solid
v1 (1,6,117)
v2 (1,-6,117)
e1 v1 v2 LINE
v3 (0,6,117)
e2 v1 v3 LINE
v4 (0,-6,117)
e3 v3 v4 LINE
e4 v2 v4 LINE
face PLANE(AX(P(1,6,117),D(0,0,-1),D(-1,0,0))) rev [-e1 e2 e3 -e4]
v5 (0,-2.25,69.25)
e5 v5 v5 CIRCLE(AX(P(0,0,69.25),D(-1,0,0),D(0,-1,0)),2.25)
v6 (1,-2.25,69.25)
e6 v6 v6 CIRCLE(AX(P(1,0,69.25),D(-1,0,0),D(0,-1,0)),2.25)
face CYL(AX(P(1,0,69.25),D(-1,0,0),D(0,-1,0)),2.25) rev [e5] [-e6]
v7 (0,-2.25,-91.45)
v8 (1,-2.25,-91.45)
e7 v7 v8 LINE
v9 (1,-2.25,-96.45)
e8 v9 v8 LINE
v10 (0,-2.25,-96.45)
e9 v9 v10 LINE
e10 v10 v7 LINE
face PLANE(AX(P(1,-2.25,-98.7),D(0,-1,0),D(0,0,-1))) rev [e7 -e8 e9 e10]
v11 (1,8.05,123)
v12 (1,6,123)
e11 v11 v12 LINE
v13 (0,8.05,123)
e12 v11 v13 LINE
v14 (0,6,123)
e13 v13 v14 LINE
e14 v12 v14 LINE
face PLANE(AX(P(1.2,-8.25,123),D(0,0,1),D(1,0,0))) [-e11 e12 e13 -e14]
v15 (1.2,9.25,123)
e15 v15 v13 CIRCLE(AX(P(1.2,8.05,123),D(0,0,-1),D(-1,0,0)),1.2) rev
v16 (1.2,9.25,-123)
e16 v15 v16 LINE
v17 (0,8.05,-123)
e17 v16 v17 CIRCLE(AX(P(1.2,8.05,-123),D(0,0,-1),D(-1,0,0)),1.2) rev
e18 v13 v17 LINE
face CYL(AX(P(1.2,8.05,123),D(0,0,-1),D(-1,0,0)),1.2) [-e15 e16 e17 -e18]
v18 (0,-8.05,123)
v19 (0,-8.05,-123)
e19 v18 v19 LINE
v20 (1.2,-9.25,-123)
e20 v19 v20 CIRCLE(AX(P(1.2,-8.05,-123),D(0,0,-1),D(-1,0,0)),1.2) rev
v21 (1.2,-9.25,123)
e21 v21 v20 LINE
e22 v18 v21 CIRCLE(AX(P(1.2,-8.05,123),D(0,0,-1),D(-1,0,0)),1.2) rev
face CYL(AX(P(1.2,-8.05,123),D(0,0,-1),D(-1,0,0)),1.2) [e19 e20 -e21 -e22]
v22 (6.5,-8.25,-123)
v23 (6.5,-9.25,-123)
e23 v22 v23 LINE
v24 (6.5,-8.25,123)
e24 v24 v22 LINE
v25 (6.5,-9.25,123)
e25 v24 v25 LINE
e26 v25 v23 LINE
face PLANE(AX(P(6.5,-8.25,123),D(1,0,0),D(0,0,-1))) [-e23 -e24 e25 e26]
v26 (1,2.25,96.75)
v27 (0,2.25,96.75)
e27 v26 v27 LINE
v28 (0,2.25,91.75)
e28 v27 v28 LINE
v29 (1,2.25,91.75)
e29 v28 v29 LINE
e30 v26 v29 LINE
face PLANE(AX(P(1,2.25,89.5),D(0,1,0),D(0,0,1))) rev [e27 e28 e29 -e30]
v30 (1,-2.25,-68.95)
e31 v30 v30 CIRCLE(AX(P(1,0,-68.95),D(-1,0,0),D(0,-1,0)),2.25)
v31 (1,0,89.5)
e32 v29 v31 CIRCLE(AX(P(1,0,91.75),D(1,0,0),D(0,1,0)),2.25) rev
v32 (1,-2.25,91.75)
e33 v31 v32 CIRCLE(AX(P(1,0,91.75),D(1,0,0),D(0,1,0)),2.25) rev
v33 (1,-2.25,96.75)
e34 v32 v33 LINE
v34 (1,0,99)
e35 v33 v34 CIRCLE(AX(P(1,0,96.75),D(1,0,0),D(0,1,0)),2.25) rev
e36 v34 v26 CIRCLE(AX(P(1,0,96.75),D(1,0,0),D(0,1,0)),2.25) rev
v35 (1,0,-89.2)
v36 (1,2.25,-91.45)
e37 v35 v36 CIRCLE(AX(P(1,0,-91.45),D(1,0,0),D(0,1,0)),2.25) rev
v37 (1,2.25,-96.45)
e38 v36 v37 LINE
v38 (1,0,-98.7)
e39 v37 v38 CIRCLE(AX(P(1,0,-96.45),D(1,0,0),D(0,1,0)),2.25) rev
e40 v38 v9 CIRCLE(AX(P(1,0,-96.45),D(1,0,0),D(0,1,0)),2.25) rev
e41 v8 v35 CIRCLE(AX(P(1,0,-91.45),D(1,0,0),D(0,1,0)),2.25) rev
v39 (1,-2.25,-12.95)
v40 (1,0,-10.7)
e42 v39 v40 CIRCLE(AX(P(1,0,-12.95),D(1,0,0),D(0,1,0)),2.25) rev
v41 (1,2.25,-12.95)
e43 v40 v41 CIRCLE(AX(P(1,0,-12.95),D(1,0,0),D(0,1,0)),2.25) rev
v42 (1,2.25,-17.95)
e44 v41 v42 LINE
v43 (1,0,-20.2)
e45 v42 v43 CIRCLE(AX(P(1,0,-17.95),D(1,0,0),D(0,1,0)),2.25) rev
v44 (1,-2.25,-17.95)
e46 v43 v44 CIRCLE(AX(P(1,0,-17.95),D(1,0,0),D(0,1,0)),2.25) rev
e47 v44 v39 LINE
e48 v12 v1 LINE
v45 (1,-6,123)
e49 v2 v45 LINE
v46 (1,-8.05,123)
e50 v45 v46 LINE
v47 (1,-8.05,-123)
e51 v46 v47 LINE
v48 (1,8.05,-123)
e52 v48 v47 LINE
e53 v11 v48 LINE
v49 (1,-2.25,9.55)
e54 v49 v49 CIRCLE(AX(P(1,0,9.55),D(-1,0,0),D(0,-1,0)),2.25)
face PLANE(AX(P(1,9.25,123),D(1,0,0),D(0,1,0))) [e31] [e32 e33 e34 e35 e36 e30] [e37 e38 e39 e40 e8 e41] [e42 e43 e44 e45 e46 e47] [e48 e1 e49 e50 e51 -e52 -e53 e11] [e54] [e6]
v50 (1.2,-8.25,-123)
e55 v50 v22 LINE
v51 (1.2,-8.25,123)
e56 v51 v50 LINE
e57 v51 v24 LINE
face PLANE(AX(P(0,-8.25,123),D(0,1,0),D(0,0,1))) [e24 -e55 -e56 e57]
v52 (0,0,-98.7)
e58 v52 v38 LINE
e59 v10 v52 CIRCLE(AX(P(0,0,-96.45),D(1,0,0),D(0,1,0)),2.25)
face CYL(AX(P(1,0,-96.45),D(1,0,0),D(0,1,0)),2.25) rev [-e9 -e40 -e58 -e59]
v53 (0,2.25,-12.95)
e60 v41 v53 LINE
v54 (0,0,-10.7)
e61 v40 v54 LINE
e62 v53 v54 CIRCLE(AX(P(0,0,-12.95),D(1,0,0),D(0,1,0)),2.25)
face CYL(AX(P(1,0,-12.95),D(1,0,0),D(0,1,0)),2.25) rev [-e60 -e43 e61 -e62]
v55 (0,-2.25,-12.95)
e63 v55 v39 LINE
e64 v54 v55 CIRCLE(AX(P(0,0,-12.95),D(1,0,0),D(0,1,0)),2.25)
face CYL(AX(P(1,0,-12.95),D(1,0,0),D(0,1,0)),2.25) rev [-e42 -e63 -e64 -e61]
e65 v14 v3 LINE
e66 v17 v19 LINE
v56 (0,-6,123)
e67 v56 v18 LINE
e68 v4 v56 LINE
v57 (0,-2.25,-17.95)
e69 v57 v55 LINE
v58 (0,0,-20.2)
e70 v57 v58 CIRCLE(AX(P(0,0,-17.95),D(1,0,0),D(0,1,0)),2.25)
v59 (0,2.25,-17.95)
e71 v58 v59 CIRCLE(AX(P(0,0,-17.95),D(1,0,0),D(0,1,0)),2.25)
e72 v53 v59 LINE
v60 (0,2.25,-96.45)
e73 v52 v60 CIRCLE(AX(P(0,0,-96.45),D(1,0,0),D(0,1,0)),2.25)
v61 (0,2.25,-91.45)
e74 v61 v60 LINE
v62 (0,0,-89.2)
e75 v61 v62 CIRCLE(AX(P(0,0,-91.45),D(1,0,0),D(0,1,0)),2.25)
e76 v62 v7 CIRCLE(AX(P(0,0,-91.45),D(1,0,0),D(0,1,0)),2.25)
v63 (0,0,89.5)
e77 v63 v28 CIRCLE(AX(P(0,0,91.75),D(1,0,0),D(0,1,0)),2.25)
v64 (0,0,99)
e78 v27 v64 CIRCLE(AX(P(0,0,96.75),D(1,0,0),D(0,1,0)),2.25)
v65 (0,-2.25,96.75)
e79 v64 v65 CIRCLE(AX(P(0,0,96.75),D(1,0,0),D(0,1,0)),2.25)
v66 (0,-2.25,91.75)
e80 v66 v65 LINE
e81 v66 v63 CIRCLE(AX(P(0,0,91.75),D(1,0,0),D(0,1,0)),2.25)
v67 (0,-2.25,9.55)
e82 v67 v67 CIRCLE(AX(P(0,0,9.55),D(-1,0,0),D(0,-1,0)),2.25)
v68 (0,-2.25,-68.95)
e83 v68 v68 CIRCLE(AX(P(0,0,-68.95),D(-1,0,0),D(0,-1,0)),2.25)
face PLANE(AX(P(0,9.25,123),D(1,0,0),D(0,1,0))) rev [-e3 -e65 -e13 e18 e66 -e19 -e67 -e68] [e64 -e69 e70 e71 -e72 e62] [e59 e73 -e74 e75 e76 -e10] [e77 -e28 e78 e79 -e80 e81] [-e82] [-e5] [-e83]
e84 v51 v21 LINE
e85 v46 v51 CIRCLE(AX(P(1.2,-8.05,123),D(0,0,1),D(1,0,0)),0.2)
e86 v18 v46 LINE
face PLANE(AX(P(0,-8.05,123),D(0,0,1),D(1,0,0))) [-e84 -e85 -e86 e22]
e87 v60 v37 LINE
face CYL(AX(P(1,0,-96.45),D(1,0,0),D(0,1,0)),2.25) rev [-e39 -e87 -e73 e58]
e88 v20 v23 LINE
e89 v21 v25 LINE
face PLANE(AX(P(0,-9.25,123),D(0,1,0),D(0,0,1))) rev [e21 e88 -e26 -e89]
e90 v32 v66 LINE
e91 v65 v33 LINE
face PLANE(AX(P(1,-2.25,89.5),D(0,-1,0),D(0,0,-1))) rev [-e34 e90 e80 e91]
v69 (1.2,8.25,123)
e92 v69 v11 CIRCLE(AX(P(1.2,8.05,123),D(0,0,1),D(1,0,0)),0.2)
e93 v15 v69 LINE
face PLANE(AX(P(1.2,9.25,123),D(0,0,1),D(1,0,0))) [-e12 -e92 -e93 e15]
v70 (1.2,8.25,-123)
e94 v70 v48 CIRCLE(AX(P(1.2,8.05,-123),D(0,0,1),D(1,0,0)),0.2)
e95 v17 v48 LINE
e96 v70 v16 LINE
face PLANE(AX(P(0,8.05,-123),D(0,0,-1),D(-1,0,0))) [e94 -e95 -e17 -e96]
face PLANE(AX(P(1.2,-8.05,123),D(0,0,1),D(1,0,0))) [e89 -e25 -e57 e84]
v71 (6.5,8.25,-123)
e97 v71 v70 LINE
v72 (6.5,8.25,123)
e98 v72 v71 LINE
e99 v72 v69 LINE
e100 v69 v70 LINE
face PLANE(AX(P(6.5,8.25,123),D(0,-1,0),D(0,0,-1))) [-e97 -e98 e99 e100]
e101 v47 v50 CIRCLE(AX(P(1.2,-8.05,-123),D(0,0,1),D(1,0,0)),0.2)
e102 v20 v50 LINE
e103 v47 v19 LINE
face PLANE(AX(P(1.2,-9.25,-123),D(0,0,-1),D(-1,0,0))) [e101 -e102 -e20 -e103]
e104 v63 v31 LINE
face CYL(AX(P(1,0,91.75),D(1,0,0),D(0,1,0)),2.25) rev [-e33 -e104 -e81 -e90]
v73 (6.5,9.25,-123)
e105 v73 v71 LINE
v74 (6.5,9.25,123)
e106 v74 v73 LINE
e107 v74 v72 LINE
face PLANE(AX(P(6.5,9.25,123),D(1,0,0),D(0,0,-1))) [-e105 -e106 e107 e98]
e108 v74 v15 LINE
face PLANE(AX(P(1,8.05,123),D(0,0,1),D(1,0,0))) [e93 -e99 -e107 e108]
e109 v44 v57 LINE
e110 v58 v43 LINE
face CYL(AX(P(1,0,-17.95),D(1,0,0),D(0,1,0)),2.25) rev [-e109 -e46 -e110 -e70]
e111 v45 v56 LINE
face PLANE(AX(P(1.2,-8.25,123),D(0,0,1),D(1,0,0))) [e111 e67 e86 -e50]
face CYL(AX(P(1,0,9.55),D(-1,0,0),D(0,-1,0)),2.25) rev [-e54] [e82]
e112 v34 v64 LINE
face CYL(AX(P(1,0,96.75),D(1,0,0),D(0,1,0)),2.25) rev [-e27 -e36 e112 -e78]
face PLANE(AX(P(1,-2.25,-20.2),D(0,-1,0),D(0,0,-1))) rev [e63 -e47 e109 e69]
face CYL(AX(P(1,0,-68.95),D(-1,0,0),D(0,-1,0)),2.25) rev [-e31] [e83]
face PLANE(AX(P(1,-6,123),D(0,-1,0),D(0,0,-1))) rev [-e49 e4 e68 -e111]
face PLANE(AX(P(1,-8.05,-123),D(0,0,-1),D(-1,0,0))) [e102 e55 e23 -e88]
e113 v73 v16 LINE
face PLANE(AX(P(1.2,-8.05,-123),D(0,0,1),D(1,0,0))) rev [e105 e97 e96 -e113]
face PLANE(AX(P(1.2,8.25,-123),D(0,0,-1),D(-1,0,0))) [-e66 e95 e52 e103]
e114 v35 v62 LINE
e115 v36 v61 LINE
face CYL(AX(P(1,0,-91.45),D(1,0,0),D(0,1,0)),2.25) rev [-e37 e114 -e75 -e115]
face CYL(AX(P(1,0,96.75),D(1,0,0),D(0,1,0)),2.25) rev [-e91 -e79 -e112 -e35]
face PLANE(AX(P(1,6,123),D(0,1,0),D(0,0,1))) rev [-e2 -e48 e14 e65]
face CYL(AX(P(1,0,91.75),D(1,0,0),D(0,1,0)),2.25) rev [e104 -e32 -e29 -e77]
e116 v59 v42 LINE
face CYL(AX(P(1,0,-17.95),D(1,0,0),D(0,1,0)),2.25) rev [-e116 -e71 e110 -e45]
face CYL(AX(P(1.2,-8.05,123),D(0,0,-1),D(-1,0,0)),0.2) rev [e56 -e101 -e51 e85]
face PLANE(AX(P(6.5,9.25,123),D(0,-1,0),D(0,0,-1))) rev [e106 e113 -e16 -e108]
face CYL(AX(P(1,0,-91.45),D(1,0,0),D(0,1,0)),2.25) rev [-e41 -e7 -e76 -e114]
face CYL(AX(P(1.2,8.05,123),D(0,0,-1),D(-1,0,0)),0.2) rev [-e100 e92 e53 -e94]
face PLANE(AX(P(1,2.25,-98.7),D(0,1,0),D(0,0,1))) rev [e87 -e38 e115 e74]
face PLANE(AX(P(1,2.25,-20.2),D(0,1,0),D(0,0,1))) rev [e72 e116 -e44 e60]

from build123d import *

# Parameters (mm, degrees)
SM_BASE_FLANGE_1_DEPTH         = 123
SKETCH_2_W                     = 6
SKETCH_2_H                     = 12
CUT_EXTRUDE_1_DEPTH            = 1
SKETCH_3_W                     = 9.5
SKETCH_3_H                     = 4.5
CUT_EXTRUDE_2_DEPTH            = 1
FILLET_1_R                     = 2.25
SKETCH_4_R                     = 2.25
CUT_EXTRUDE_3_DEPTH            = 1
PATTERN_LINEAR_1_COUNT         = 2
PATTERN_LINEAR_1_PITCH         = 109.7
FILLET_1_OF_PATTERN_LINEAR_1_R = 2.25
PATTERN_LINEAR_2_COUNT         = 2
PATTERN_LINEAR_2_PITCH         = 188.2
FILLET_1_OF_PATTERN_LINEAR_2_R = 2.25
PATTERN_LINEAR_3_COUNT         = 2
PATTERN_LINEAR_3_PITCH         = 59.7
PATTERN_LINEAR_4_COUNT         = 2
PATTERN_LINEAR_4_PITCH         = 138.2


# Sheet-metal steps are written as plain solids
with BuildPart() as part:
    # Sketch 1 → Базовая кромка1 (new, symmetric)
    with BuildSketch(Plane.XY):
        with BuildLine():
            Line((6.5, 9.25), (1.2, 9.25))
            ThreePointArc((1.2, 9.25), (0.351471863, 8.898528137), (0, 8.05))
            Line((0, 8.05), (0, -8.05))
            ThreePointArc((0, -8.05), (0.351471863, -8.898528137), (1.2, -9.25))
            Line((1.2, -9.25), (6.5, -9.25))
            Line((6.5, -9.25), (6.5, -8.25))
            Line((6.5, -8.25), (1.2, -8.25))
            ThreePointArc((1.2, -8.25), (1.058578644, -8.191421356), (1, -8.05))
            Line((1, -8.05), (1, 8.05))
            ThreePointArc((1, 8.05), (1.058578644, 8.191421356), (1.2, 8.25))
            Line((1.2, 8.25), (6.5, 8.25))
            Line((6.5, 8.25), (6.5, 9.25))
        make_face()
    extrude(amount=SM_BASE_FLANGE_1_DEPTH, both=True)

    # Эскиз2 → Вытянуть1 (cut)
    with BuildSketch(Plane.ZY):
        with Locations((120, 0)):
            Rectangle(SKETCH_2_W, SKETCH_2_H)
    extrude(amount=-CUT_EXTRUDE_1_DEPTH, mode=Mode.SUBTRACT)

    # Эскиз3 → Вытянуть2 (cut)
    with BuildSketch(Plane.ZY):
        with Locations((94.25, 0)):
            Rectangle(SKETCH_3_W, SKETCH_3_H)
    cut_extrude_2 = extrude(amount=-CUT_EXTRUDE_2_DEPTH, mode=Mode.SUBTRACT)

    # Скругление1
    fillet_1_edges = [part.edges().sort_by_distance(p)[0] for p in [
        (0.5, 2.25, 99),
        (0.5, -2.25, 99),
        (0.5, 2.25, 89.5),
        (0.5, -2.25, 89.5),
    ]]
    fillet(fillet_1_edges, radius=FILLET_1_R - 0.0001)  # a hair under: the kernel refuses the full size

    # Эскиз4 → Вытянуть3 (cut)
    with BuildSketch(Plane.ZY):
        with Locations(Location((69.25, 0, 0), (0, 0, 270))):
            Circle(SKETCH_4_R)
    cut_extrude_3 = extrude(amount=-CUT_EXTRUDE_3_DEPTH, mode=Mode.SUBTRACT)

    # Линейный массив1: Вытянуть2 ×2
    with Locations(*[(0, 0, -i * PATTERN_LINEAR_1_PITCH) for i in range(1, PATTERN_LINEAR_1_COUNT)]):
        add(cut_extrude_2, mode=Mode.SUBTRACT)

    # Скругление1 of Линейный массив1
    fillet_1_of_pattern_linear_1_edges = [part.edges().sort_by_distance(p)[0] for p in [
        (0.5, 2.25, -10.7),
        (0.5, -2.25, -10.7),
        (0.5, 2.25, -20.2),
        (0.5, -2.25, -20.2),
    ]]
    fillet(fillet_1_of_pattern_linear_1_edges, radius=FILLET_1_OF_PATTERN_LINEAR_1_R - 0.0001)  # a hair under: the kernel refuses the full size

    # Линейный массив2: Вытянуть2 ×2
    with Locations(*[(0, 0, -i * PATTERN_LINEAR_2_PITCH) for i in range(1, PATTERN_LINEAR_2_COUNT)]):
        add(cut_extrude_2, mode=Mode.SUBTRACT)

    # Скругление1 of Линейный массив2
    fillet_1_of_pattern_linear_2_edges = [part.edges().sort_by_distance(p)[0] for p in [
        (0.5, 2.25, -89.2),
        (0.5, -2.25, -89.2),
        (0.5, 2.25, -98.7),
        (0.5, -2.25, -98.7),
    ]]
    fillet(fillet_1_of_pattern_linear_2_edges, radius=FILLET_1_OF_PATTERN_LINEAR_2_R - 0.0001)  # a hair under: the kernel refuses the full size

    # Линейный массив3: Вытянуть3 ×2
    with Locations(*[(0, 0, -i * PATTERN_LINEAR_3_PITCH) for i in range(1, PATTERN_LINEAR_3_COUNT)]):
        add(cut_extrude_3, mode=Mode.SUBTRACT)

    # Линейный массив4: Вытянуть3 ×2
    with Locations(*[(0, 0, -i * PATTERN_LINEAR_4_PITCH) for i in range(1, PATTERN_LINEAR_4_COUNT)]):
        add(cut_extrude_3, mode=Mode.SUBTRACT)


solid = part.part
